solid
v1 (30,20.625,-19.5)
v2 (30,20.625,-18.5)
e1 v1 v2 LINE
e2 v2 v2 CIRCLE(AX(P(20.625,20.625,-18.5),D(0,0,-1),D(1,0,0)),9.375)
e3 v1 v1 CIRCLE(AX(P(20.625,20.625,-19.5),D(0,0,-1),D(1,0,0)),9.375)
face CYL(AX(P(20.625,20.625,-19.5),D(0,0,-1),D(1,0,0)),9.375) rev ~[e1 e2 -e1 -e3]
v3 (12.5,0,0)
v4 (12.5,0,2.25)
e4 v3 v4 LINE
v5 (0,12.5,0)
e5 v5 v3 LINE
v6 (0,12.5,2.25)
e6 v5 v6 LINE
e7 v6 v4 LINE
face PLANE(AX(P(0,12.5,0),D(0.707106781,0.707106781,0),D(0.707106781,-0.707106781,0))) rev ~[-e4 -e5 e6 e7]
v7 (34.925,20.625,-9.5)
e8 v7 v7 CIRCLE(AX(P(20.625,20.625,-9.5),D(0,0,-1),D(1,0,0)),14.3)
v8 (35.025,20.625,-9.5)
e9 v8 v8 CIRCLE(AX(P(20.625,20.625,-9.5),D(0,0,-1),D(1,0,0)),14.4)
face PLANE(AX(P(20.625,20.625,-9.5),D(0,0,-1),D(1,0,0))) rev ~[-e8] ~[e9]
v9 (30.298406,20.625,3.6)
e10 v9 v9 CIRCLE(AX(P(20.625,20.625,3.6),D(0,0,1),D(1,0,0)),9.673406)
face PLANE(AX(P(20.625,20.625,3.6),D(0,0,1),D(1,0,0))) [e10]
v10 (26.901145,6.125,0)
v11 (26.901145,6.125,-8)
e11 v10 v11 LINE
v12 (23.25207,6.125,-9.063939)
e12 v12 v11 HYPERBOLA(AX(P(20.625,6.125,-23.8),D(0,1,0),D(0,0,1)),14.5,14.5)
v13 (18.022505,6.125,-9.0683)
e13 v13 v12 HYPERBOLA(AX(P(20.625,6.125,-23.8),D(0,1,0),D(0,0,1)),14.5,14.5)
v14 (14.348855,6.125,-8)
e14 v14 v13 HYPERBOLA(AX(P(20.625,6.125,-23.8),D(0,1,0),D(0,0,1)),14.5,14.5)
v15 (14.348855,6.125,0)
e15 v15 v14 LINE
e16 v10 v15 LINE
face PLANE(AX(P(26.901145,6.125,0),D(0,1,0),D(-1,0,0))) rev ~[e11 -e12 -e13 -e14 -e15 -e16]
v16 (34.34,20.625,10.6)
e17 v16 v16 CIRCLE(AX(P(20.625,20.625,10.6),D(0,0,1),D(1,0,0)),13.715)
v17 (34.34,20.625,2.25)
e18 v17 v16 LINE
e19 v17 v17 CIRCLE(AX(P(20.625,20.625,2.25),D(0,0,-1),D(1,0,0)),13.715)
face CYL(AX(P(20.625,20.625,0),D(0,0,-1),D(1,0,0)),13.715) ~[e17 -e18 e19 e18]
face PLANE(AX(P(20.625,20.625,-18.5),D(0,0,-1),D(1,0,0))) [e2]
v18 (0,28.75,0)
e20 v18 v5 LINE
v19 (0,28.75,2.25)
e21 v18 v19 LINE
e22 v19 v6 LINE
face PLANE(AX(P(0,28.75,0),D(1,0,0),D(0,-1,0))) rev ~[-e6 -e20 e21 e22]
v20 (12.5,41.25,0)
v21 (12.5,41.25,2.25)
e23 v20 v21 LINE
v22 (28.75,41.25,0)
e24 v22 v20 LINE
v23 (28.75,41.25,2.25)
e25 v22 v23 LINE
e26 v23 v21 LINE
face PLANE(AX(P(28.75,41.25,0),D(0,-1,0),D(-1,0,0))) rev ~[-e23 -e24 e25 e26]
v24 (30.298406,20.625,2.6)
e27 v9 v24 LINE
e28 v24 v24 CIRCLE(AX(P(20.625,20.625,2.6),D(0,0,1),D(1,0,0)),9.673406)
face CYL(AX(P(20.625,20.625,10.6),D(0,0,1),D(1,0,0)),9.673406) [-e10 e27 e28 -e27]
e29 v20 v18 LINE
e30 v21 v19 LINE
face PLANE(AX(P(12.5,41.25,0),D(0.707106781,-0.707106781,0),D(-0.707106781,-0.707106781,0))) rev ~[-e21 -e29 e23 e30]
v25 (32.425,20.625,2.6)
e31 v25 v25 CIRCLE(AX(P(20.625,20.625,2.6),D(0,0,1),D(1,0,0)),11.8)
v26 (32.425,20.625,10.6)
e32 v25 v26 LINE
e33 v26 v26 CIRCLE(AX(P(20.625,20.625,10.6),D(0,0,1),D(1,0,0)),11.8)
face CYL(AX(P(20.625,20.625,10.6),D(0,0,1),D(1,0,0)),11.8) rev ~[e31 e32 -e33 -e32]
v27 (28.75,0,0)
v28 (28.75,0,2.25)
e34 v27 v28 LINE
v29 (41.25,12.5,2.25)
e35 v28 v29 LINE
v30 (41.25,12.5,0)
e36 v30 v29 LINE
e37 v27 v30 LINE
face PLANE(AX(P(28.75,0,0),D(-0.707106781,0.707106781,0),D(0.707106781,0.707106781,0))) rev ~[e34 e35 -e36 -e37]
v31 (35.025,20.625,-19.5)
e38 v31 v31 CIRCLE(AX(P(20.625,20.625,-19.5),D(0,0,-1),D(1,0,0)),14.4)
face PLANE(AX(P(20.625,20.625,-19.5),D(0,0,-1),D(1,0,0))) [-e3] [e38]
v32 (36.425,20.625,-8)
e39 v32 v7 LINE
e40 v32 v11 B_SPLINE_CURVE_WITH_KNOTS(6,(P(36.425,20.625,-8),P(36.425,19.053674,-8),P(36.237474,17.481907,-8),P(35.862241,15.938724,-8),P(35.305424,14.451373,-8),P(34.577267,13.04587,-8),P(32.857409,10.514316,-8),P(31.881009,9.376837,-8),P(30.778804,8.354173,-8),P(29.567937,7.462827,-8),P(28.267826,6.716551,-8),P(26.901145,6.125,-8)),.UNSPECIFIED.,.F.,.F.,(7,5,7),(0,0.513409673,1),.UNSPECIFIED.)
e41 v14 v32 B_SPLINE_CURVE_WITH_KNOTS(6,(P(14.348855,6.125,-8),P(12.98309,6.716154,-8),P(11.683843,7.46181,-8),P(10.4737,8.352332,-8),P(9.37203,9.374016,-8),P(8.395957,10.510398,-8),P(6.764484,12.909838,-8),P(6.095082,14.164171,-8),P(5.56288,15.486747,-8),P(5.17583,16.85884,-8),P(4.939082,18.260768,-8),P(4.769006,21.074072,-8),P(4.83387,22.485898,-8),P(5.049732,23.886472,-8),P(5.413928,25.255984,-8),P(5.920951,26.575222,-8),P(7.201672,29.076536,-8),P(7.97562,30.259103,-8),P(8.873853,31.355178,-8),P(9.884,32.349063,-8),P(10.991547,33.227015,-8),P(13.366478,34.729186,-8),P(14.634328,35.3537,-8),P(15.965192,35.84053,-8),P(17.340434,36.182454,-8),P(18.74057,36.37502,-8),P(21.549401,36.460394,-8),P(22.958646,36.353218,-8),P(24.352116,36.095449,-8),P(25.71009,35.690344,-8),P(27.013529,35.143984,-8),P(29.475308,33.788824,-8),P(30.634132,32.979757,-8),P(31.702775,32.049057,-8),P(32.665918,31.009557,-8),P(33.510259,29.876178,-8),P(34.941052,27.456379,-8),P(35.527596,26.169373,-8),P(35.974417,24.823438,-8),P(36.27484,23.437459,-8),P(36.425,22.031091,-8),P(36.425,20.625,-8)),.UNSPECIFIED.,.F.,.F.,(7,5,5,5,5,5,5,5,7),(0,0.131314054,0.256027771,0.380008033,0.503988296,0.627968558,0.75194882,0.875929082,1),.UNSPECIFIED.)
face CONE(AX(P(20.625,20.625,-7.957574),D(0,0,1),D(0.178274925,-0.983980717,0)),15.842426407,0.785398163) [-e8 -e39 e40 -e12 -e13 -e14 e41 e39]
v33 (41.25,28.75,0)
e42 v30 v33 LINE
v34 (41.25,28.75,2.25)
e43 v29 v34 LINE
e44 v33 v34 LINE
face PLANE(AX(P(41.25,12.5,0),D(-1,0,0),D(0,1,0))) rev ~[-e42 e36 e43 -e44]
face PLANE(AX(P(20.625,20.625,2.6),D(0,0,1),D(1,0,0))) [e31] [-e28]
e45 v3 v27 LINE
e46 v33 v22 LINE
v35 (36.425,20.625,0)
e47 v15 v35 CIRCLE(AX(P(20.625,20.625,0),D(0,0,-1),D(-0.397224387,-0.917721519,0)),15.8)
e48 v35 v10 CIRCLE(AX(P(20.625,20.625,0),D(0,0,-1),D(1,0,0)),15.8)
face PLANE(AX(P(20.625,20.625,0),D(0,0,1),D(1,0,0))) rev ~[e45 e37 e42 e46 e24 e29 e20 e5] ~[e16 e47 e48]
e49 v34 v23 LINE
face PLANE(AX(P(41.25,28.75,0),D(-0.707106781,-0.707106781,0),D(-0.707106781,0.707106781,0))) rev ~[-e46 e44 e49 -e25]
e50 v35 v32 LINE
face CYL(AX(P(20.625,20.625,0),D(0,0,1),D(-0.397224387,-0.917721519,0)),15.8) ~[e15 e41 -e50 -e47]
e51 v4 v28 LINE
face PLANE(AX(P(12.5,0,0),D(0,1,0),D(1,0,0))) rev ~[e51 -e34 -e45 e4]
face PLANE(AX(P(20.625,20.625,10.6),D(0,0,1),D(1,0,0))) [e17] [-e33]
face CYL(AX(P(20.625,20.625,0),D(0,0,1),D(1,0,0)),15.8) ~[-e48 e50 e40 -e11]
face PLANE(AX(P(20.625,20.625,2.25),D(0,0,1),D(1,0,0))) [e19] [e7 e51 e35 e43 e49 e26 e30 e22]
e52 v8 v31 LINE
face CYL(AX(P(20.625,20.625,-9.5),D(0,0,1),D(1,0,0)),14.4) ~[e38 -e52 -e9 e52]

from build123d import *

# Parameters (mm, degrees)
F1_DEPTH    = 2.25
F2_R        = 13.715
F3_DEPTH    = 10.6
F5_DEPTH    = 9.5
F6_T2_ANGLE = 280.2692951884
F6_T4_ANGLE = 100.1752461875
F7_R        = 14.4
F8_DEPTH    = 10
F9_R        = 11.8
F10_DEPTH   = 7
F11_R       = 11.8
F11_R_2     = 9.6734059383
F12_DEPTH   = 8
F13_R       = 9.375
F14_DEPTH   = 1


# Not quite as in the source:
# - a fillet or chamfer that OpenCascade refuses, or shapes differently, is made with other operations: its cross-section is extruded or revolved along the edge and cut away or added


with BuildPart() as f1:
    # F0 (on Top) → F1 (new body)
    with BuildSketch(Plane.XY):
        Polygon((0, 12.5), (12.5, 0), (28.75, 0), (41.25, 12.5), (41.25, 28.75), (28.75, 41.25), (12.5, 41.25), (0, 28.75), align=None)
    extrude(amount=F1_DEPTH)

    # F2 (on Top) → F3 (join)
    with BuildSketch(Plane.XY):
        with Locations((20.625, 20.625)):
            Circle(F2_R)
    extrude(amount=F3_DEPTH)

    # F4 (on face) → F5 (join)
    with BuildSketch(Plane(origin=(0, 0, 0), x_dir=(1, 0, 0), z_dir=(0, 0, -1))):
        with BuildLine():
            ThreePointArc((14.3488546862, -6.125), (11.9509898535, -33.8311178239), (36.425, -20.625))
            ThreePointArc((36.425, -20.625), (33.8311178239, -11.9509898535), (26.9011453138, -6.125))
            Line((26.9011453138, -6.125), (14.3488546862, -6.125))
        make_face()
    extrude(amount=F5_DEPTH)

    # F6: chamfer of 1.5 on 2 edges, made by hand

    # F6_s1 → F6_t2 (revolve, cut)
    with BuildSketch(Plane(origin=(23.5875160096, 4.2735214072, 0), x_dir=(0, 0, 1), z_dir=(0.9839807168, 0.1782749254, 0))):
        with BuildLine():
            Line((-7.9575735931, -0.7752555397), (-9.5424264069, -2.3601083535))
            Line((-9.5424264069, -2.3601083535), (-9.5724264069, -2.3601083535))
            ThreePointArc((-9.5724264069, -2.3601083535), (-9.53, -1.58889515), (-9.53, -0.8176819466))
            Line((-9.53, -0.8176819466), (-9.5, -0.7876819466))
            ThreePointArc((-9.5, -0.7876819466), (-8.7287867966, -0.7876819466), (-7.9575735931, -0.7452555397))
            Line((-7.9575735931, -0.7452555397), (-7.9575735931, -0.7752555397))
        make_face()
    revolve(axis=Axis((20.625, 20.625, -9.5), (0, 0, -1)), revolution_arc=F6_T2_ANGLE, mode=Mode.SUBTRACT)

    # F6_s3 → F6_t4 (revolve, cut)
    with BuildSketch(Plane.XZ.offset(-20.625)):
        with BuildLine():
            Line((36.4674264069, -7.9575735931), (34.8825735931, -9.5424264069))
            Line((34.8825735931, -9.5424264069), (34.8825735931, -9.5724264069))
            ThreePointArc((34.8825735931, -9.5724264069), (35.6537867966, -9.53), (36.425, -9.53))
            Line((36.425, -9.53), (36.455, -9.5))
            ThreePointArc((36.455, -9.5), (36.455, -8.7287867966), (36.4974264069, -7.9575735931))
            Line((36.4974264069, -7.9575735931), (36.4674264069, -7.9575735931))
        make_face()
    revolve(axis=Axis((20.625, 20.625, -9.5), (0, 0, -1)), revolution_arc=F6_T4_ANGLE, mode=Mode.SUBTRACT)

    # F7 (on face) → F8 (join)
    with BuildSketch(Plane(origin=(0, 0, -9.5), x_dir=(1, 0, 0), z_dir=(0, 0, -1))):
        with Locations((20.625, -20.625)):
            Circle(F7_R)
    extrude(amount=F8_DEPTH)

    # F9 (on face) → F10 (cut)
    with BuildSketch(Plane.XY.offset(10.6)):
        with Locations((20.625, 20.625)):
            Circle(F9_R)
    extrude(amount=-F10_DEPTH, mode=Mode.SUBTRACT)

    # F11 (on face) → F12 (cut)
    with BuildSketch(Plane.XY.offset(10.6)):
        with Locations((20.625, 20.625)):
            Circle(F11_R)
        with Locations((20.625, 20.625)):
            Circle(F11_R_2, mode=Mode.SUBTRACT)
    extrude(amount=-F12_DEPTH, mode=Mode.SUBTRACT)

    # F13 (on face) → F14 (cut)
    with BuildSketch(Plane(origin=(0, 0, -19.5), x_dir=(1, 0, 0), z_dir=(0, 0, -1))):
        with Locations((20.625, -20.625)):
            Circle(F13_R)
    extrude(amount=-F14_DEPTH, mode=Mode.SUBTRACT)


solid = f1.part
